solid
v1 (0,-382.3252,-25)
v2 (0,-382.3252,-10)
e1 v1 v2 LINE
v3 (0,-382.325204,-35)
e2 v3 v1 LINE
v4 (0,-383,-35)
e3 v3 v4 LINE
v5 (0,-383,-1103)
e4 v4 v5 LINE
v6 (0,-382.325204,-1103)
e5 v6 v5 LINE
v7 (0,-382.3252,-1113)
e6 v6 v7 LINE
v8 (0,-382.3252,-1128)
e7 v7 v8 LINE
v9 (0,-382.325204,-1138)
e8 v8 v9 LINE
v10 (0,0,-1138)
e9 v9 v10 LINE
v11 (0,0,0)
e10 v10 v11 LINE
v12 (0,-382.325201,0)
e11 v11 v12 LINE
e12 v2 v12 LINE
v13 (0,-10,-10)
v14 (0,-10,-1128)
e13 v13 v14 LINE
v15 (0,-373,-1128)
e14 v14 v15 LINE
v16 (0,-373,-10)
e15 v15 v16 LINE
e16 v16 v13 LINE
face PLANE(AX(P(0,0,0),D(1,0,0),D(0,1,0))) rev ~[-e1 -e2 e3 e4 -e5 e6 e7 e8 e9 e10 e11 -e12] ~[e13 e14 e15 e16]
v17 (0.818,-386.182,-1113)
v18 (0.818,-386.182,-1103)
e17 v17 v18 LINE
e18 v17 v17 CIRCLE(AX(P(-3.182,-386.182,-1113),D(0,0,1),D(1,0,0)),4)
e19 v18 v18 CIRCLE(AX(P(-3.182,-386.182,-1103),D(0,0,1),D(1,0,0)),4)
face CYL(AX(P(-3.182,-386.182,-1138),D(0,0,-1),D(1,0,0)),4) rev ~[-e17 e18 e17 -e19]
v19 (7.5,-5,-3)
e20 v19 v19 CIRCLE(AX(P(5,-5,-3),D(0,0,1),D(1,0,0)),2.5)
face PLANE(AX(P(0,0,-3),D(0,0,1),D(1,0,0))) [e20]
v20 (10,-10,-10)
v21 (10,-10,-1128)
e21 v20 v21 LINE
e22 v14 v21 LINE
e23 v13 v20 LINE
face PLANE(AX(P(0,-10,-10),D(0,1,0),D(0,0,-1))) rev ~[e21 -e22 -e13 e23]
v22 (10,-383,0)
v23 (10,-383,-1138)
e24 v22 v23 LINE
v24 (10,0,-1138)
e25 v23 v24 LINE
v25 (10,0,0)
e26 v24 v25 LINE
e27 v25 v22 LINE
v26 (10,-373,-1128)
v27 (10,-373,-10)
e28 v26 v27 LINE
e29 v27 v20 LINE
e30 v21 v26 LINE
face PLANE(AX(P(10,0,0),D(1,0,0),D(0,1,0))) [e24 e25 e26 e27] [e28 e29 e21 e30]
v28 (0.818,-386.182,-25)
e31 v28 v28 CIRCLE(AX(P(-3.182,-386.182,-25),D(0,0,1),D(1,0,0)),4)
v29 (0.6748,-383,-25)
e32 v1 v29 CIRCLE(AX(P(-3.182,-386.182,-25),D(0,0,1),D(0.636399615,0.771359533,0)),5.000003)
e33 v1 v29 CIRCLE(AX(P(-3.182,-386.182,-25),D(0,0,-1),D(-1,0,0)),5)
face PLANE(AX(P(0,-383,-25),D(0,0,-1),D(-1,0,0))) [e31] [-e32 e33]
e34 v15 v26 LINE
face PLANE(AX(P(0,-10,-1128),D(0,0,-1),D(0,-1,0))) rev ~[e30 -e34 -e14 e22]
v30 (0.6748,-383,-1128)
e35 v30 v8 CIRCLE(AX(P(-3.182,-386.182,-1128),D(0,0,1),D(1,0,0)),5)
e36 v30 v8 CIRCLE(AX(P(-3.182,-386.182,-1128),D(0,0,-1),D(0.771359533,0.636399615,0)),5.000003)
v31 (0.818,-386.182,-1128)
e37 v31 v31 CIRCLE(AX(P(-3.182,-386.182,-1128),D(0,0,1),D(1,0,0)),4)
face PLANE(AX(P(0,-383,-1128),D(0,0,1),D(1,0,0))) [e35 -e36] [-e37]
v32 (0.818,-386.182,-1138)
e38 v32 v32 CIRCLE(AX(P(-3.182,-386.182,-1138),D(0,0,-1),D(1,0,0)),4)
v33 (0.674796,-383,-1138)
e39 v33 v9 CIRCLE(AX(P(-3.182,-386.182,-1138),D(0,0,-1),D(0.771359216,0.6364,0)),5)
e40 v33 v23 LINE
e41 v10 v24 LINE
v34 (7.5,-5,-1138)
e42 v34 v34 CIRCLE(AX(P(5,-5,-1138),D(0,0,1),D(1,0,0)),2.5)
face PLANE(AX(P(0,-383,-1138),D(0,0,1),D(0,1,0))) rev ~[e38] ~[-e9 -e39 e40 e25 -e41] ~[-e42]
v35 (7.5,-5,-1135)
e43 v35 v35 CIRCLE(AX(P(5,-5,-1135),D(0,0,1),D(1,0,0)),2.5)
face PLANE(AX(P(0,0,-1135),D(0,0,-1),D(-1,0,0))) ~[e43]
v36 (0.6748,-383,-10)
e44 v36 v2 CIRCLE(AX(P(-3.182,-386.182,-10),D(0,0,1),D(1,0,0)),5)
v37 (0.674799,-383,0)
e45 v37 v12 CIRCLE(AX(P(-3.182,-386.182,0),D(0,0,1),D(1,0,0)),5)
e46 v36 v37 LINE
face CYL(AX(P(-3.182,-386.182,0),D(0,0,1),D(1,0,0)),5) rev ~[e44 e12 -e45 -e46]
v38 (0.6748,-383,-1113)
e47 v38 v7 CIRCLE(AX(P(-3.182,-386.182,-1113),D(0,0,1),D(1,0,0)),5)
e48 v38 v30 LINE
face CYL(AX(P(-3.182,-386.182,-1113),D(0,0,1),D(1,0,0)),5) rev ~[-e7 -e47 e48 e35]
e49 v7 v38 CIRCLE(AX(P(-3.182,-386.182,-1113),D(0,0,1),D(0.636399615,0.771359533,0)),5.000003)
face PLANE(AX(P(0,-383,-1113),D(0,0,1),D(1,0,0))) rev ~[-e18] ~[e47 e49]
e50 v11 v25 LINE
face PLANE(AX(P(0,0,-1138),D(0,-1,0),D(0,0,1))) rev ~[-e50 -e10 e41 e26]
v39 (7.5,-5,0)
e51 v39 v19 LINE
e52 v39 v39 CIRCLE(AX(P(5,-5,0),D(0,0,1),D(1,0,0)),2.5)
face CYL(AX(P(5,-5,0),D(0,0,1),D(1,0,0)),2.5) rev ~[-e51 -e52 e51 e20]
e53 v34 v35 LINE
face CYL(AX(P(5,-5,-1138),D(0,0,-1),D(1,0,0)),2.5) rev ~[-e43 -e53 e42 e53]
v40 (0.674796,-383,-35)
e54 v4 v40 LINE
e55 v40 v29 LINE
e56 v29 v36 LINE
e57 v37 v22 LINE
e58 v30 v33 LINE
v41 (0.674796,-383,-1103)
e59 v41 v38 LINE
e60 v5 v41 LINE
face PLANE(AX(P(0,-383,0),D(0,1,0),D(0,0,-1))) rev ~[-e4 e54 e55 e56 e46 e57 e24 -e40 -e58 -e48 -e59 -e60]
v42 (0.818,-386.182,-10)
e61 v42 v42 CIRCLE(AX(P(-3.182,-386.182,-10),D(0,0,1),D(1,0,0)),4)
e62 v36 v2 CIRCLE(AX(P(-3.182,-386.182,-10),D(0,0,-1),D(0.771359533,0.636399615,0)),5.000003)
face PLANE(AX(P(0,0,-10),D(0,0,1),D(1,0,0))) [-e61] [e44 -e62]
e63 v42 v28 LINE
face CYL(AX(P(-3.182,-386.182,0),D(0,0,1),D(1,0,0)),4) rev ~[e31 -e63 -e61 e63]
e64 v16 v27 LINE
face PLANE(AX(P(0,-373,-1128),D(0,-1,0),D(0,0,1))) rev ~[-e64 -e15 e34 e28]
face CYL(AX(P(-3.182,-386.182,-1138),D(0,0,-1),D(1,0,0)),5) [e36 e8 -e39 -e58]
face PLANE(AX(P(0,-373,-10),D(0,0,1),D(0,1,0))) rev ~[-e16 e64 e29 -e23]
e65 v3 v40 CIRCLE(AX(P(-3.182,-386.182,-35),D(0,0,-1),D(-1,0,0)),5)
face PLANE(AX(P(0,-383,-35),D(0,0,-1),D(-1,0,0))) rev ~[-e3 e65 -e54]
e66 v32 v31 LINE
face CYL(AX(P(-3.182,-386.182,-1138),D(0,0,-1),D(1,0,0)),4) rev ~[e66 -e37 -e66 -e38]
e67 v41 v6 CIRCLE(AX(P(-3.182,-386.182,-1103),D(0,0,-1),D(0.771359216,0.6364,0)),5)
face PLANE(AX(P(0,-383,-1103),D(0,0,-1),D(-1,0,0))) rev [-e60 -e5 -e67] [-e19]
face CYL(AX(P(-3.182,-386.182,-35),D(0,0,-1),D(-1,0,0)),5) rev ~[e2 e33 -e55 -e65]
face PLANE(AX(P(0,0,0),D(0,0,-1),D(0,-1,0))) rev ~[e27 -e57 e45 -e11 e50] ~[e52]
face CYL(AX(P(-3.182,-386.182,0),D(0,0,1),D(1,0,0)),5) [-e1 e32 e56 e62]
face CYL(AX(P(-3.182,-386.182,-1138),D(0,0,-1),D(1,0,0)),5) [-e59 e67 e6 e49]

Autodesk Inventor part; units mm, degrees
ref_plane "YZ Plane" through (0, 0, 0) normal (1, 0, 0) x (0, 1, 0)
ref_plane "XZ Plane" through (0, 0, 0) normal (0, 1, 0) x (-1, 0, 0)
ref_plane "XY Plane" through (0, 0, 0) normal (0, 0, 1) x (1, 0, 0)
sketch "Sketch1" plane through (0, 0, 0) normal (1, 0, 0) x (0, 1, 0)
  line L0 (0, 0) -> (-383, 0)
  line L1 (-383, 0) -> (-383, -1138)
  line L2 (-383, -1138) -> (0, -1138)
  line L3 (0, -1138) -> (0, 0)
  line L4 (-373, -1128) -> (-373, -10)
  line L5 (-373, -10) -> (-10, -10)
  line L6 (-10, -10) -> (-10, -1128)
  line L7 (-10, -1128) -> (-373, -1128)
  dimension "d0" = 383
  dimension "d1" = 1138
  dimension "d2" = 10
extrude "Extrusion1" add sketch "Sketch1" along normal blind 10
sketch "Sketch2" plane through (0, -383, 0) normal (0, 0, 1) x (1, 0, 0)
  line L0 (0, 383) -> (0, 0) projected
  line L1 (0, 0) -> (10, 0) projected
  line L2 (10, 383) -> (10, 0) projected
  line L3 (0, 383) -> (10, 383) projected
  line L4 (0, 0) -> (-3.182, -3.182)
  line L5 (0, 0) -> (4.5, 0) construction
  line L6 (0, 383) -> (0, 0) projected
  circle A0 centre (-3.182, -3.182) radius 5
  circle A1 centre (-3.182, -3.182) radius 4
  dimension "d5" = 4.5
  dimension "d6" = 135
  dimension "d7" = 1
  dimension "d10" = 10
extrude "Extrusion2" add sketch "Sketch2" against normal blind 35 contours A0 L1 L0 | L0 L1 A0
ref_plane "Work Plane1" through (0, 0, -569) normal (0, 0, 1) x (1, 0, 0)
mirror "Mirror1" about plane through (0, 0, -569) normal (0, 0, 1) of "Extrusion2"
fillet "Fillet1" [suppressed]
ref_plane "Work Plane2" through (0, -383, -1113) normal (0, 0, 1) x (1, 0, 0)
sketch "Sketch3" plane through (0, -383, -1113) normal (0, 0, 1) x (1, 0, 0)
  arc A0 (0, 0.6748) -> (0.6748, 0) centre (-3.182, -3.182) ccw projected
  circle A1 centre (-3.182, -3.182) radius 4 projected
  line L0 (0.6748, 0) -> (10, 0) projected
  circle A2 centre (-3.182, -3.182) radius 5
  point P0 (0, 383)
  point P1 (0, 0.6748)
extrude "Extrusion3" cut sketch "Sketch3" against normal blind 15
sketch "Sketch4" plane through (0, 0, 0) normal (0, 0, 1) x (1, 0, 0)
  circle A0 centre (-3.182, -386.182) radius 4 projected
  arc A1 (0, -382.3252) -> (0.6748, -383) centre (-3.182, -386.182) ccw projected
  circle A2 centre (-3.182, -386.182) radius 4 projected
  line L0 (0.6748, -383) -> (10, -383) projected
  circle A3 centre (-3.182, -386.182) radius 5
  point P0 (0, 0)
  point P1 (0, -382.3252)
extrude "Extrusion4" cut sketch "Sketch4" against normal blind 10
sketch "Sketch5" plane through (0, -383, -35) normal (0, 0, -1) x (-1, 0, 0)
  circle A0 centre (3.182, -3.182) radius 4 projected
  arc A1 (-0.6748, 0) -> (0, 0.6748) centre (3.182, -3.182) ccw projected
  circle A2 centre (3.182, -3.182) radius 5
  point P0 (0, 383)
  point P1 (0, 0.6748)
extrude "Extrusion5" cut sketch "Sketch5" against normal blind 10
sketch "Sketch6" plane through (0, 0, 0) normal (0, 0, 1) x (1, 0, 0)
  arc A0 (0.6748, -383) -> (0, -382.3252) centre (-3.182, -386.182) ccw projected
  line L0 (0.6748, -383) -> (10, -383) projected
  line L1 (10, 0) -> (10, -383) projected
  line L2 (0, 0) -> (10, 0) projected
  line L3 (0, 0) -> (0, -382.3252) projected
  line L4 (10, -383) -> (10, 0) construction
  line L5 (0, -10) -> (10, -10) construction
  line L6 (10, 0) -> (0, -10) construction
  line L7 (0, 0) -> (10, 0) construction
  line L8 (0, 0) -> (10, -10) construction
  circle A1 centre (5, -5) radius 2.5
  dimension "d19" = 5
extrude "Extrusion6" cut sketch "Sketch6" against normal blind 3 contours A1
sketch "Sketch7" plane through (5, -5, -3) normal (0, 0, 1) x (1, 0, 0)
  circle A0 centre (0, 0) radius 2.5 projected
  circle A1 centre (0, 0) radius 7.5
  line L0 (13, -13) -> (-13, -13)
  line L1 (-13, -13) -> (-13, 13)
  line L2 (-13, 13) -> (13, 13)
  line L3 (13, 13) -> (13, -13)
  line L4 (13, -13) -> (-13, 13) construction
  line L5 (-13, -13) -> (13, 13) construction
  point P0 (-5, 5)
  dimension "d22" = 15
  dimension "d25" = 26
  dimension "d26" = 26
extrude "Extrusion7" [suppressed]
mirror "Mirror2" about plane through (0, 0, -569) normal (0, 0, 1) of "Extrusion6"
equation "\"d25\" = d26"
properties part number "porta1"
